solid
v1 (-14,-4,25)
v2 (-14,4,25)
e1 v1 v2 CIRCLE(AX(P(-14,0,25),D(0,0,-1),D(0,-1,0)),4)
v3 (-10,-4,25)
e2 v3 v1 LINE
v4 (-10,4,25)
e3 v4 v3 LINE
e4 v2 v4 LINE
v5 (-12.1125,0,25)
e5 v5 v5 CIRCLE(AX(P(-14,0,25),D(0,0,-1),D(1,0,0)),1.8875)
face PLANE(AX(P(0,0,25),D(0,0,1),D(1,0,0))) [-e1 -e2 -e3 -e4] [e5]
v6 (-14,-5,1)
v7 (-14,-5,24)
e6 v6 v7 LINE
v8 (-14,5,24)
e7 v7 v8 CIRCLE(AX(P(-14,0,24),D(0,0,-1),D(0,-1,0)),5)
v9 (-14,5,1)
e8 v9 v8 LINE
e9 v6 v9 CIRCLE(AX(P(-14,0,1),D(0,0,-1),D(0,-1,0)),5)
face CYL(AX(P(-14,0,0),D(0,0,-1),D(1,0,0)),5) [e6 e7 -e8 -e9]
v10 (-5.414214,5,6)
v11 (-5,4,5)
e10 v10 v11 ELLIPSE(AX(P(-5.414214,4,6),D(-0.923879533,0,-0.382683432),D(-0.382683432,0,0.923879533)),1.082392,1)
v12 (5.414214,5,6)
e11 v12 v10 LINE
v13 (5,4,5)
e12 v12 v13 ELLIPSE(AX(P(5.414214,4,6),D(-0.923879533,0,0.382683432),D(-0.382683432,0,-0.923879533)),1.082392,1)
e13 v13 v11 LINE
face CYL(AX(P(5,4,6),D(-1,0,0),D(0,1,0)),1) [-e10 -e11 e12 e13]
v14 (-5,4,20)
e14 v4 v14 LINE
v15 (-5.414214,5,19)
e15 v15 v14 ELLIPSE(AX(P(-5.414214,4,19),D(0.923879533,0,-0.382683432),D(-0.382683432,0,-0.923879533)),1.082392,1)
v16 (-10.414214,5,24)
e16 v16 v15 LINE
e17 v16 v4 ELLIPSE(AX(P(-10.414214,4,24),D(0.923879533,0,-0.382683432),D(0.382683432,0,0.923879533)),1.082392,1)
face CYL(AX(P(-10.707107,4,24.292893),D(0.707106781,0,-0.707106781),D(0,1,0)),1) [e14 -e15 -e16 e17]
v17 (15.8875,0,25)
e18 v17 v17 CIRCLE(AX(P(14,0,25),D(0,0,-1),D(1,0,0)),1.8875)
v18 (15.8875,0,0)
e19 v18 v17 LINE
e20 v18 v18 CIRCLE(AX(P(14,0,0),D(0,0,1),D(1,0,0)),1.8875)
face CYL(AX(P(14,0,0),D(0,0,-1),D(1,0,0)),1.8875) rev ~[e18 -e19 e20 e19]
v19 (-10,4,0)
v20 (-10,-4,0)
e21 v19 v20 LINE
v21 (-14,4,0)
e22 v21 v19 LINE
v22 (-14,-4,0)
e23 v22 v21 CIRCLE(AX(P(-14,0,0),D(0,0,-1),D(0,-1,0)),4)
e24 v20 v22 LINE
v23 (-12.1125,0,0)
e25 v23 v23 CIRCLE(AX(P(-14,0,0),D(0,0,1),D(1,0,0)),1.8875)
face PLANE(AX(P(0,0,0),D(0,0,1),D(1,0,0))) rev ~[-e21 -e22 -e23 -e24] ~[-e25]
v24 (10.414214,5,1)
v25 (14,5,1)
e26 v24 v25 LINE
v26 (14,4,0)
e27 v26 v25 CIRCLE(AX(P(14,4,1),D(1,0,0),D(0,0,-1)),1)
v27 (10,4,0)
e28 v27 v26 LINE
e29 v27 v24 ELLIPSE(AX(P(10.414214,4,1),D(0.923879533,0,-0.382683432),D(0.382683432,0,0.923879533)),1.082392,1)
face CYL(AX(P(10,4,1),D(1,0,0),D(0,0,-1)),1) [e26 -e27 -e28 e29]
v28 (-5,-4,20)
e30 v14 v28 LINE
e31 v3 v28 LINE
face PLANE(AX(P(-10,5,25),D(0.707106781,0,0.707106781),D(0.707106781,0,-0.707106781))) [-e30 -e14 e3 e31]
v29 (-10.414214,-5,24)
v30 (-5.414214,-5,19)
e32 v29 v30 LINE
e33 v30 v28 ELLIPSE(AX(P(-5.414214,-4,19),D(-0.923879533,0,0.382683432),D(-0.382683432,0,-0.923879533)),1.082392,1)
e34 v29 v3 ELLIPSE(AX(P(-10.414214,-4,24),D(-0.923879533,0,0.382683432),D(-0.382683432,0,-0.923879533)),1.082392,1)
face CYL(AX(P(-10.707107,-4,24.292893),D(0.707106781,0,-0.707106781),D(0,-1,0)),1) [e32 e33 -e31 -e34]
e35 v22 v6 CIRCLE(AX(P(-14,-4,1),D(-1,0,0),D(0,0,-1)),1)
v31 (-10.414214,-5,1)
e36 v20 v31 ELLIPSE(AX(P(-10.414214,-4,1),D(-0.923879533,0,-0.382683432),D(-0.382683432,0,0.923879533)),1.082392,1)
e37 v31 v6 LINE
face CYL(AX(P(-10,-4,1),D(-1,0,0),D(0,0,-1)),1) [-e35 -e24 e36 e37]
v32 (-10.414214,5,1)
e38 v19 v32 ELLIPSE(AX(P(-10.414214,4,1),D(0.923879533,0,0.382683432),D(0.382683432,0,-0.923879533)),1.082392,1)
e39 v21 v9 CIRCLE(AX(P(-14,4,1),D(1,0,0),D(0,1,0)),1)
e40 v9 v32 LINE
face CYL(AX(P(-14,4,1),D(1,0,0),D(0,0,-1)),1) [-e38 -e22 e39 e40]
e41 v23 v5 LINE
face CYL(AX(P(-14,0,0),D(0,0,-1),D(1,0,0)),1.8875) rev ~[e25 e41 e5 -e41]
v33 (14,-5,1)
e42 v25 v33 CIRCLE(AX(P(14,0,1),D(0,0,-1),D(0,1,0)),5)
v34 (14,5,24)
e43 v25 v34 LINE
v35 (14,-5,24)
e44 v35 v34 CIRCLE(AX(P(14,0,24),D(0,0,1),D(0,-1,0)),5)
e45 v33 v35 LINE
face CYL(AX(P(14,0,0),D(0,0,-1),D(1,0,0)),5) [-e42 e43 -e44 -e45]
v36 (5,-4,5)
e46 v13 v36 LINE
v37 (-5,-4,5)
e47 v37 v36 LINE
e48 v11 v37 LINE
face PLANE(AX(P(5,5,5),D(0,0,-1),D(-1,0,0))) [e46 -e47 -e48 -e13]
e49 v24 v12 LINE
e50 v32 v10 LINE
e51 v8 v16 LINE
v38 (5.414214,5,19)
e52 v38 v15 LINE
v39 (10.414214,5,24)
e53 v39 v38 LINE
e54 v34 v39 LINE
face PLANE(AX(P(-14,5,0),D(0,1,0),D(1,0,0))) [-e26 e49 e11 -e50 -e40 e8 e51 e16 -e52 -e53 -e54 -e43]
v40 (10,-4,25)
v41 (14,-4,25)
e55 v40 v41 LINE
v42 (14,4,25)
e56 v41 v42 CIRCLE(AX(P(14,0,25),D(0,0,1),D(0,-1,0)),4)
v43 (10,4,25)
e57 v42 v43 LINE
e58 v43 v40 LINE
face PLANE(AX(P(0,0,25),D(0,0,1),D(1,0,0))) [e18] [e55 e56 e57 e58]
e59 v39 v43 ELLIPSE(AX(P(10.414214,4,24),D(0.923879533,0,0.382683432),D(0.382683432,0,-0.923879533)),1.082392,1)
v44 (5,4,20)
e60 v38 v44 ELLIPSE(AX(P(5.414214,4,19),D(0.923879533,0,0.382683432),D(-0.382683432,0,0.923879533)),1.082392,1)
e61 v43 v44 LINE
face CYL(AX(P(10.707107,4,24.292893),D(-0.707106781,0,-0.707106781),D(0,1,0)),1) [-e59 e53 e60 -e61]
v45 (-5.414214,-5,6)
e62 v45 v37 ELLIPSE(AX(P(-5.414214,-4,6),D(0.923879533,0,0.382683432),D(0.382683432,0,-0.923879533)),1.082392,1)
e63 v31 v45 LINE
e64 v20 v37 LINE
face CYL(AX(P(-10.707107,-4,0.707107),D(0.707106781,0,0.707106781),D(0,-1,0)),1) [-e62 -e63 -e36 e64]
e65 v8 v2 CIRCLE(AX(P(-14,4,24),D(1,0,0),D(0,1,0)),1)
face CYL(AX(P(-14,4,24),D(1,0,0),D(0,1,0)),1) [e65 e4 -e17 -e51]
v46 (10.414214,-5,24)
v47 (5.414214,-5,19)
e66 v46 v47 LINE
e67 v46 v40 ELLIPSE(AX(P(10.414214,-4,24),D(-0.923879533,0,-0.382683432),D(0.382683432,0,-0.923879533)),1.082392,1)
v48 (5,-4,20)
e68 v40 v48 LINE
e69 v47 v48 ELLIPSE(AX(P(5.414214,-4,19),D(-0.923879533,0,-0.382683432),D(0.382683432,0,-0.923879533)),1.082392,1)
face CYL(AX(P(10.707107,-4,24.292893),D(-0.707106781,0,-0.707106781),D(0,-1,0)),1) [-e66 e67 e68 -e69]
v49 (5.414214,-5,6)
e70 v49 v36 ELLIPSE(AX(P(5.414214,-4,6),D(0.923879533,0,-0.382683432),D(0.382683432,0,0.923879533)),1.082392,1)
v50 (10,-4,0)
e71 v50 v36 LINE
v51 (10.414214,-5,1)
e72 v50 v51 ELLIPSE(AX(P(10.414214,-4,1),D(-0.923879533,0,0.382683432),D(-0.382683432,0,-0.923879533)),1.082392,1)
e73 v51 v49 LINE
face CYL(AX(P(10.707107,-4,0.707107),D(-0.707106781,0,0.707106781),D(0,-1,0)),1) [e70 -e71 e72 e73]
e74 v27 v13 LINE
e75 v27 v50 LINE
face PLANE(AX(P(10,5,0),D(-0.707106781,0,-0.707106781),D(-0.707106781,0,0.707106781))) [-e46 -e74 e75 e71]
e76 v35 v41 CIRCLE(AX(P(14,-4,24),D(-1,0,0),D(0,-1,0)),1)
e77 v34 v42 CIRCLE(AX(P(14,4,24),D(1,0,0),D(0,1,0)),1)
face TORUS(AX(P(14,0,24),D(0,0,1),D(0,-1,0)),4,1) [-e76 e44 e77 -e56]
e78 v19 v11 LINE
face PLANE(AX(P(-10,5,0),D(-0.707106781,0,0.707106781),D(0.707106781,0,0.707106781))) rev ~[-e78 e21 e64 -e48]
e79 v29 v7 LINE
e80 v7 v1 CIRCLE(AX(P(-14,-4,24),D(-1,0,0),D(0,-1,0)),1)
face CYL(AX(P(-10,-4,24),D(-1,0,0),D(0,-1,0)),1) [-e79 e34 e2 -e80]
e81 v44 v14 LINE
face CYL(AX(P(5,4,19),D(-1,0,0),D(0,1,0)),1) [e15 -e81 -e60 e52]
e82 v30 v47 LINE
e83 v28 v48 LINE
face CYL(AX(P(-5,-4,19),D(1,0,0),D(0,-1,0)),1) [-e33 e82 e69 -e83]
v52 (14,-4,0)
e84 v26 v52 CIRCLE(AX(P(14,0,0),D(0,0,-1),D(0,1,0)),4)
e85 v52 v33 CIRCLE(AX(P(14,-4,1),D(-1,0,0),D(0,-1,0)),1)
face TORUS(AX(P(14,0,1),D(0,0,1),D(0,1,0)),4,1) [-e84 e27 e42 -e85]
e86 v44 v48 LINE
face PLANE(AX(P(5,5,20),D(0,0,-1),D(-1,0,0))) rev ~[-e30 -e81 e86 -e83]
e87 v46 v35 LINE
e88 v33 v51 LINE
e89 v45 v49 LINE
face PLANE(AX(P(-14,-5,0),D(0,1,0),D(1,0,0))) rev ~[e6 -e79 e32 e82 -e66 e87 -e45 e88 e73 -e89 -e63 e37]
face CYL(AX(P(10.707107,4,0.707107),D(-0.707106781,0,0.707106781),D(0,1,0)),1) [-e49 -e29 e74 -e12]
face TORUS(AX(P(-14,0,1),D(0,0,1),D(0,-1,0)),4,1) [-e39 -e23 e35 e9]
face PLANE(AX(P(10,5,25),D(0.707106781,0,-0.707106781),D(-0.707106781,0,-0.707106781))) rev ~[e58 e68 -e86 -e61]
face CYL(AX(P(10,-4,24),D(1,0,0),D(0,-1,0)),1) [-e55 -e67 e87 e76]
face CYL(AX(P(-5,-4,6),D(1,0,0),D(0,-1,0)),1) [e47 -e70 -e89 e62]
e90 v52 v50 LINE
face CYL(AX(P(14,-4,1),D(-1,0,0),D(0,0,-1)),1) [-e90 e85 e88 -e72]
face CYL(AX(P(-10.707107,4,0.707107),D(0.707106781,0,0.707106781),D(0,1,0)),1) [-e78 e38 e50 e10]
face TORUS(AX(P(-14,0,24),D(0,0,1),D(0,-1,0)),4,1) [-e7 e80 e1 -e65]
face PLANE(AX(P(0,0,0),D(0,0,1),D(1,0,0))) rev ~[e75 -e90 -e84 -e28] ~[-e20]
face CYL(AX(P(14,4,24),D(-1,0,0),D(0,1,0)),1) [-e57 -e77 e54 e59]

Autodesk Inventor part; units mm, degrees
ref_plane "YZ Plane" through (0, 0, 0) normal (1, 0, 0) x (0, 1, 0)
ref_plane "XZ Plane" through (0, 0, 0) normal (0, 1, 0) x (-1, 0, 0)
ref_plane "XY Plane" through (0, 0, 0) normal (0, 0, 1) x (1, 0, 0)
sketch "Sketch1" plane through (0, 0, 0) normal (0, 0, 1) x (1, 0, 0)
  circle A0 centre (-14, 0) radius 1.8875
  circle A1 centre (-14, 0) radius 5
  line L0 (0, -7) -> (0, 7) projected
  circle A2 centre (14, 0) radius 1.8875
  circle A3 centre (14, 0) radius 5
  line L1 (-14, 5) -> (-5, 5)
  line L2 (-5, 5) -> (0, 5)
  line L3 (14, 5) -> (5, 5)
  line L4 (5, 5) -> (0, 5)
  line L5 (-26.6, 0) -> (26.6, 0) projected
  line L6 (-14, -5) -> (-5, -5)
  line L7 (-5, -5) -> (0, -5)
  line L8 (5, -5) -> (0, -5)
  line L9 (14, -5) -> (5, -5)
  point P0 (0, 0)
  point P1 (14, 5)
  point P2 (-14, -5)
  point P3 (14, -5)
  dimension "d1" = 10
  dimension "d0" = 3.775
  dimension "d2" = 28
  dimension "d3" = 5
  dimension "d4" = 5
extrude "Extrusion1" add sketch "Sketch1" along normal blind 25 contours L5 A1 A0 | A0 L5 A1 | L5 L0 L7 L6 A1 | A1 L1 L2 L0 L5 | L5 A3 L9 L8 L0 | L0 L4 L3 A3 L5 | L5 A2 A3 | A3 L5 A2
sketch "Sketch2" plane through (-14, 5, 0) normal (0, 1, 0) x (1, 0, 0)
  line L0 (28, -25) -> (0, -25) projected
  line L1 (4, -25) -> (9, -20)
  line L2 (9, -20) -> (14, -20)
  line L3 (28, 0) -> (0, 0) projected
  line L4 (28, 0) -> (28, -25) projected
  line L5 (28, -12.5) -> (1.8875, -12.5)
  line L6 (1.8875, -25) -> (1.8875, 0) projected
  line L7 (28, 0) -> (0, 0)
  line L8 (4, 0) -> (9, -5)
  line L9 (9, -5) -> (14, -5)
  line L10 (14, -25) -> (14, 0)
  line L11 (24, -25) -> (19, -20)
  line L12 (19, -20) -> (14, -20)
  line L13 (24, 0) -> (19, -5)
  line L14 (19, -5) -> (14, -5)
  point P0 (14, 0)
  point P1 (4, 0)
  dimension "d7" = 45
  dimension "d8" = 15
  dimension "d9" = 10
extrude "Extrusion2" cut sketch "Sketch2" against normal up to surface (10 mm away) contours L0 L10 L12 L11 | L0 L1 L2 L10 | L13 L14 L10 L3 | L9 L8 L3 L10
fillet "Fillet1" radius 1 20 edges at (-12, -5, 25) (-12, 5, 25) (-19, 0, 25) (-7.5, 5, 22.5) (0, 5, 20) (7.5, 5, 22.5) (19, 0, 25) (-7.5, -5, 22.5) (0, -5, 20) (7.5, -5, 22.5) (19, 0, 0) (-12, 5, 0) (-12, -5, 0) (7.5, -5, 2.5) (0, -5, 5) (-7.5, -5, 2.5) (-19, 0, 0) (-7.5, 5, 2.5) (0, 5, 5) (7.5, 5, 2.5)
properties part number "ConectorBrazos"
